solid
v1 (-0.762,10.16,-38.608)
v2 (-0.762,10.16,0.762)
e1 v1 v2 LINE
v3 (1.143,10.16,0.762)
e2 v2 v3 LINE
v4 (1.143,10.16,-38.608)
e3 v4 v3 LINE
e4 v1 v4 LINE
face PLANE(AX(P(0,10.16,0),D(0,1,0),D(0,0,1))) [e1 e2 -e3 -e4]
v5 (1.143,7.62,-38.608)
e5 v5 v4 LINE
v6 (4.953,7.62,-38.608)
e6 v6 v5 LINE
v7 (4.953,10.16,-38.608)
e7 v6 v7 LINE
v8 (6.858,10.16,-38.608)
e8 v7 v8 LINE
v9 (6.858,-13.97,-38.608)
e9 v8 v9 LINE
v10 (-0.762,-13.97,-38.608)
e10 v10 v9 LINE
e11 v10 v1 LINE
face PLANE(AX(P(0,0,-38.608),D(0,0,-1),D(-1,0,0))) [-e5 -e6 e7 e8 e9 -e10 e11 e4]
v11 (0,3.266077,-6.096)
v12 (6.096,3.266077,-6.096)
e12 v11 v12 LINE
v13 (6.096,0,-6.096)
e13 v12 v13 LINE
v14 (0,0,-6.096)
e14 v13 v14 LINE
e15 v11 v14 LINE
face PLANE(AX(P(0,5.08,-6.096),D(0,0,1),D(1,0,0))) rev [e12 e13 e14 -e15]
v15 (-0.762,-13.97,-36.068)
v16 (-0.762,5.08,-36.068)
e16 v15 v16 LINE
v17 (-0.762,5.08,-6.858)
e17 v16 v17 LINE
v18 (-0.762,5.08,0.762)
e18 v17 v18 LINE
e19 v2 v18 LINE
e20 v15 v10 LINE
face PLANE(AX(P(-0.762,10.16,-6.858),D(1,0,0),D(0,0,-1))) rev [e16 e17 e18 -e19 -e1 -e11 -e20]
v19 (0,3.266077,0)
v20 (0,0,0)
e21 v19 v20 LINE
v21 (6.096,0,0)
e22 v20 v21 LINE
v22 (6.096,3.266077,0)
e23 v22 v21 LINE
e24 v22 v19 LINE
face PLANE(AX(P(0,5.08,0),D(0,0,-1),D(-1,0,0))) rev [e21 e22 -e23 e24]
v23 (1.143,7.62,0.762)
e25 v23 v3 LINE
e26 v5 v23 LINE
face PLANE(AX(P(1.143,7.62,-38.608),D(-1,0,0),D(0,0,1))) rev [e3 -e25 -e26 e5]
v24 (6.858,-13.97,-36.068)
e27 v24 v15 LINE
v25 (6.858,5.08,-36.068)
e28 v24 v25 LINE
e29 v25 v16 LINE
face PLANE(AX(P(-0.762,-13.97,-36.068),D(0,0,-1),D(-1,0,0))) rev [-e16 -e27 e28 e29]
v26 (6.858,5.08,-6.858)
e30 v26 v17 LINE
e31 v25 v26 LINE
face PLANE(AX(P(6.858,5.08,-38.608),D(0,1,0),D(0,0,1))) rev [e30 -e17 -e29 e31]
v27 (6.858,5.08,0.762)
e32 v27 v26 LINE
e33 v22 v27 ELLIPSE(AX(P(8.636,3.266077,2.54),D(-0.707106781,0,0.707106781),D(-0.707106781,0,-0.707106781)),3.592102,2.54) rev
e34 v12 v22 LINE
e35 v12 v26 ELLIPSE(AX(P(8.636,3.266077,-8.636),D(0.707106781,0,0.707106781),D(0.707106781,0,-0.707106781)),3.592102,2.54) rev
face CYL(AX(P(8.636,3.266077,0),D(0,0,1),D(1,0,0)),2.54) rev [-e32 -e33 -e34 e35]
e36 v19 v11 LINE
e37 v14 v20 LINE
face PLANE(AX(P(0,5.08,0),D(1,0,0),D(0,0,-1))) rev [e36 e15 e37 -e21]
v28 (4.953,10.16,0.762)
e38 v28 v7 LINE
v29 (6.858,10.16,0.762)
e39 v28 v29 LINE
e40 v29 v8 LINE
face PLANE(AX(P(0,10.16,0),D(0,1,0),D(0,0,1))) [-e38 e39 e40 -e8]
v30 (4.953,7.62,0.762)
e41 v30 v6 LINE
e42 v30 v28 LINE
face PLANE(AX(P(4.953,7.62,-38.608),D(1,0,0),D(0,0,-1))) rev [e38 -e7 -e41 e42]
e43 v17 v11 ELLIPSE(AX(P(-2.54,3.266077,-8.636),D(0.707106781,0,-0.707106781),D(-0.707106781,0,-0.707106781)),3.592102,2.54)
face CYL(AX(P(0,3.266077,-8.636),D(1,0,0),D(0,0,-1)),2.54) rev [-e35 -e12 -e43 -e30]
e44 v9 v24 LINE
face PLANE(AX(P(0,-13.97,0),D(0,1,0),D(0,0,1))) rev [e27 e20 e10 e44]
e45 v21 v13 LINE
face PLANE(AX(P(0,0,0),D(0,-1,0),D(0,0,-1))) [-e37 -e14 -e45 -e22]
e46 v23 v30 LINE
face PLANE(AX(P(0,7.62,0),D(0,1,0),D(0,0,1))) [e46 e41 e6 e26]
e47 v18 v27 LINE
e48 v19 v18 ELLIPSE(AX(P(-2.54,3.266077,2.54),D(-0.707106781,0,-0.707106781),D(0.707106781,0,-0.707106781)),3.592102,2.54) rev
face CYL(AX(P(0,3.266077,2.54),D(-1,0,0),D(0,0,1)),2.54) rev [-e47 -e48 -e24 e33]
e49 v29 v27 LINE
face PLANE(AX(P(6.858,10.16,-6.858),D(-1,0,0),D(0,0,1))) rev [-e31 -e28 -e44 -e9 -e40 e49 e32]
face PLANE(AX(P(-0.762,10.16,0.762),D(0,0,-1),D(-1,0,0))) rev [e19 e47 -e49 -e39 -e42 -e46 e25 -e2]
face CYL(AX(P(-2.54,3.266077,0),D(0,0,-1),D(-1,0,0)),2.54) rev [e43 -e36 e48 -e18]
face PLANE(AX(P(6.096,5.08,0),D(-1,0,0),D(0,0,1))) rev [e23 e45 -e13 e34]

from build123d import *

# Parameters (mm, degrees)
SKETCH1_W           = 6.096
SKETCH1_H           = 6.096
BOSS_EXTRUDE1_DEPTH = 5.08
SKETCH2_W           = 7.62
SKETCH2_H           = 7.62
BOSS_EXTRUDE2_DEPTH = 5.08
FILLET1_R           = 2.54
FILLET2_R           = 2.54
SKETCH4_W           = 7.62
SKETCH4_H           = 5.08
BOSS_EXTRUDE4_DEPTH = 31.75
SKETCH5_W           = 3.81
SKETCH5_H           = 39.37
CUT_EXTRUDE1_DEPTH  = 2.54
SKETCH7_W           = 7.62
SKETCH7_H           = 2.54
BOSS_EXTRUDE5_DEPTH = 19.05


with BuildPart() as part:
    # Sketch1 → Boss-Extrude1 (new body)
    with BuildSketch(Plane(origin=(0, 0, 0), x_dir=(1, 0, 0), z_dir=(0, 1, 0))):
        with Locations((3.048, 3.048)):
            Rectangle(SKETCH1_W, SKETCH1_H)
    extrude(amount=BOSS_EXTRUDE1_DEPTH)

    # Sketch2 → Boss-Extrude2 (add)
    with BuildSketch(Plane(origin=(0, 5.08, 0), x_dir=(1, 0, 0), z_dir=(0, 1, 0))):
        with Locations((3.048, 3.048)):
            Rectangle(SKETCH2_W, SKETCH2_H)
    extrude(amount=BOSS_EXTRUDE2_DEPTH)

    # Fillet1
    # the kernel refuses this fillet: 2.54 mm, written as the material it adds along each edge
    with BuildSketch(Plane(origin=(0, 5.08, -6.096), x_dir=(-1, 0, 0), z_dir=(0, 0, 1))) as fillet1_piece_1:
        with BuildLine():
            CenterArc((2.54, 1.813922821), FILLET1_R, 180, 45.572995999)
            Line((0, 1.813922821), (-0.0508, 1.813922821))
            Line((-0.0508, 1.813922821), (-0.0508, 0))
            Line((-0.0508, 0), (0, -0.0508))
            ThreePointArc((0, -0.0508), (0.381, -0.0508), (0.72644, -0.036278456))
            Line((0.72644, -0.036278456), (0.762, 0))
        make_face()
    extrude(amount=6.096)

    # Fillet2
    # the kernel refuses this fillet: 2.54 mm, written as the material it adds along each edge
    with BuildSketch(Plane(origin=(6.096, 5.08, 0), x_dir=(0, -1, 0), z_dir=(-1, 0, 0))) as fillet2_piece_1_section:
        with BuildLine():
            CenterArc((1.813922821, 2.54), FILLET2_R, 224.427004001, 45.572995999)
            Line((0, 0.762), (-0.036278456, 0.72644))
            ThreePointArc((-0.036278456, 0.72644), (-0.0508, 0.381), (-0.0508, 0))
            Line((-0.0508, 0), (0, -0.0508))
            Line((0, -0.0508), (1.813922821, -0.0508))
            Line((1.813922821, -0.0508), (1.813922821, 0))
        make_face()
    fillet2_piece_1 = extrude(amount=6.858, mode=Mode.PRIVATE)
    fillet2_piece_1 = fillet2_piece_1 - Plane(origin=(-2.54, 3.266077179, 0.188412047), x_dir=(-1, 0, 0), z_dir=(0, 0, -1)) * Cylinder(2.54, 21, mode=Mode.PRIVATE)
    add(fillet2_piece_1)
    with BuildSketch(Plane(origin=(6.096, 5.08, 0), x_dir=(0, -1, 0), z_dir=(0, 0, -1))) as fillet2_piece_2:
        with BuildLine():
            CenterArc((1.813922821, -2.54), FILLET2_R, 90, 45.572995999)
            Line((0, -0.762), (-0.036278456, -0.72644))
            ThreePointArc((-0.036278456, -0.72644), (-0.0508, -0.381), (-0.0508, 0))
            Line((-0.0508, 0), (0, 0.0508))
            Line((0, 0.0508), (1.813922821, 0.0508))
            Line((1.813922821, 0.0508), (1.813922821, 0))
        make_face()
    extrude(amount=6.096)
    with BuildSketch(Plane(origin=(-0.762, 5.08, -6.096), x_dir=(0, 0, -1), z_dir=(1, 0, 0))) as fillet2_piece_3_section:
        with BuildLine():
            CenterArc((2.54, -1.813922821), FILLET2_R, 134.427004001, 45.572995999)
            Line((0, -1.813922821), (-0.0508, -1.813922821))
            Line((-0.0508, -1.813922821), (-0.0508, 0))
            Line((-0.0508, 0), (0, 0.0508))
            ThreePointArc((0, 0.0508), (0.381, 0.0508), (0.72644, 0.036278456))
            Line((0.72644, 0.036278456), (0.762, 0))
        make_face()
    fillet2_piece_3 = extrude(amount=6.858, mode=Mode.PRIVATE)
    fillet2_piece_3 = fillet2_piece_3 - Plane(origin=(-2.54, 3.266077179, -6.345051063), x_dir=(-1, 0, 0), z_dir=(0, 0, -1)) * Cylinder(2.54, 21, mode=Mode.PRIVATE)
    add(fillet2_piece_3)
    with BuildSketch(Plane(origin=(10.630807052, 5.08, 0), x_dir=(0, -1, 0), z_dir=(-1, 0, 0))) as fillet2_piece_4a_section:
        with BuildLine():
            CenterArc((1.813922821, 2.54), FILLET2_R, 224.427004001, 45.572995999)
            Line((0, 0.762), (-0.036278456, 0.72644))
            ThreePointArc((-0.036278456, 0.72644), (-0.0508, 0.381), (-0.0508, 0))
            Line((-0.0508, 0), (0, -0.0508))
            Line((0, -0.0508), (1.813922821, -0.0508))
            Line((1.813922821, -0.0508), (1.813922821, 0))
        make_face()
    fillet2_piece_4a = extrude(amount=11.392807052, mode=Mode.PRIVATE)
    fillet2_piece_4a = split(fillet2_piece_4a, bisect_by=Plane(origin=(6.096, 4.594869389, 0.188412047), z_dir=(1, 0, 0)), keep=Keep.TOP, mode=Mode.PRIVATE)
    fillet2_piece_4a = split(fillet2_piece_4a, bisect_by=Plane(origin=(6.858, 4.594869389, 0.188412047), z_dir=(-1, 0, 0)), keep=Keep.TOP, mode=Mode.PRIVATE)
    with BuildSketch(Plane(origin=(6.096, 5.08, 4.534807052), x_dir=(0, -1, 0), z_dir=(0, 0, -1))) as fillet2_piece_4b_section:
        with BuildLine():
            CenterArc((1.813922821, -2.54), FILLET2_R, 90, 45.572995999)
            Line((0, -0.762), (-0.036278456, -0.72644))
            ThreePointArc((-0.036278456, -0.72644), (-0.0508, -0.381), (-0.0508, 0))
            Line((-0.0508, 0), (0, 0.0508))
            Line((0, 0.0508), (1.813922821, 0.0508))
            Line((1.813922821, 0.0508), (1.813922821, 0))
        make_face()
    fillet2_piece_4b = extrude(amount=10.630807052, mode=Mode.PRIVATE)
    fillet2_piece_4b = split(fillet2_piece_4b, bisect_by=Plane(origin=(6.284412047, 4.594869389, 0), z_dir=(0, 0, 1)), keep=Keep.TOP, mode=Mode.PRIVATE)
    fillet2_piece_4b = split(fillet2_piece_4b, bisect_by=Plane(origin=(6.284412047, 4.594869389, 0.762), z_dir=(0, 0, -1)), keep=Keep.TOP, mode=Mode.PRIVATE)
    fillet2_piece_4 = fillet2_piece_4a & fillet2_piece_4b
    add(fillet2_piece_4)
    with BuildSketch(Plane(origin=(6.096, 5.08, 0), x_dir=(0, -1, 0), z_dir=(0, 0, -1))) as fillet2_piece_5a_section:
        with BuildLine():
            CenterArc((1.813922821, -2.54), FILLET2_R, 90, 45.572995999)
            Line((0, -0.762), (-0.036278456, -0.72644))
            ThreePointArc((-0.036278456, -0.72644), (-0.0508, -0.381), (-0.0508, 0))
            Line((-0.0508, 0), (0, 0.0508))
            Line((0, 0.0508), (1.813922821, 0.0508))
            Line((1.813922821, 0.0508), (1.813922821, 0))
        make_face()
    fillet2_piece_5a = extrude(amount=10.630807052, mode=Mode.PRIVATE)
    fillet2_piece_5a = split(fillet2_piece_5a, bisect_by=Plane(origin=(6.284412047, 4.594869389, -6.096), z_dir=(0, 0, -1)), keep=Keep.TOP, mode=Mode.PRIVATE)
    fillet2_piece_5a = split(fillet2_piece_5a, bisect_by=Plane(origin=(6.284412047, 4.594869389, -6.858), z_dir=(0, 0, 1)), keep=Keep.TOP, mode=Mode.PRIVATE)
    with BuildSketch(Plane(origin=(-0.762, 5.08, -6.096), x_dir=(0, 0, -1), z_dir=(1, 0, 0))) as fillet2_piece_5b_section:
        with BuildLine():
            CenterArc((2.54, -1.813922821), FILLET2_R, 134.427004001, 45.572995999)
            Line((0, -1.813922821), (-0.0508, -1.813922821))
            Line((-0.0508, -1.813922821), (-0.0508, 0))
            Line((-0.0508, 0), (0, 0.0508))
            ThreePointArc((0, 0.0508), (0.381, 0.0508), (0.72644, 0.036278456))
            Line((0.72644, 0.036278456), (0.762, 0))
        make_face()
    fillet2_piece_5b = extrude(amount=11.392807052, mode=Mode.PRIVATE)
    fillet2_piece_5b = split(fillet2_piece_5b, bisect_by=Plane(origin=(6.096, 4.594869389, -6.284412047), z_dir=(1, 0, 0)), keep=Keep.TOP, mode=Mode.PRIVATE)
    fillet2_piece_5b = split(fillet2_piece_5b, bisect_by=Plane(origin=(6.858, 4.594869389, -6.284412047), z_dir=(-1, 0, 0)), keep=Keep.TOP, mode=Mode.PRIVATE)
    fillet2_piece_5 = fillet2_piece_5a & fillet2_piece_5b
    add(fillet2_piece_5)

    # Sketch4 → Boss-Extrude4 (add)
    with BuildSketch(Plane(origin=(0, 0, -6.858), x_dir=(-1, 0, 0), z_dir=(0, 0, -1))):
        with Locations((-3.048, 7.62)):
            Rectangle(SKETCH4_W, SKETCH4_H)
    extrude(amount=BOSS_EXTRUDE4_DEPTH)

    # Sketch5 → Cut-Extrude1 (cut)
    with BuildSketch(Plane(origin=(0, 10.16, 0), x_dir=(1, 0, 0), z_dir=(0, 1, 0))):
        with Locations((3.048, 18.923)):
            Rectangle(SKETCH5_W, SKETCH5_H)
    extrude(amount=-CUT_EXTRUDE1_DEPTH, mode=Mode.SUBTRACT)

    # Sketch7 → Boss-Extrude5 (add)
    with BuildSketch(Plane.XZ.offset(-5.08)):
        with Locations((3.048, -37.338)):
            Rectangle(SKETCH7_W, SKETCH7_H)
    extrude(amount=BOSS_EXTRUDE5_DEPTH)


solid = part.part
